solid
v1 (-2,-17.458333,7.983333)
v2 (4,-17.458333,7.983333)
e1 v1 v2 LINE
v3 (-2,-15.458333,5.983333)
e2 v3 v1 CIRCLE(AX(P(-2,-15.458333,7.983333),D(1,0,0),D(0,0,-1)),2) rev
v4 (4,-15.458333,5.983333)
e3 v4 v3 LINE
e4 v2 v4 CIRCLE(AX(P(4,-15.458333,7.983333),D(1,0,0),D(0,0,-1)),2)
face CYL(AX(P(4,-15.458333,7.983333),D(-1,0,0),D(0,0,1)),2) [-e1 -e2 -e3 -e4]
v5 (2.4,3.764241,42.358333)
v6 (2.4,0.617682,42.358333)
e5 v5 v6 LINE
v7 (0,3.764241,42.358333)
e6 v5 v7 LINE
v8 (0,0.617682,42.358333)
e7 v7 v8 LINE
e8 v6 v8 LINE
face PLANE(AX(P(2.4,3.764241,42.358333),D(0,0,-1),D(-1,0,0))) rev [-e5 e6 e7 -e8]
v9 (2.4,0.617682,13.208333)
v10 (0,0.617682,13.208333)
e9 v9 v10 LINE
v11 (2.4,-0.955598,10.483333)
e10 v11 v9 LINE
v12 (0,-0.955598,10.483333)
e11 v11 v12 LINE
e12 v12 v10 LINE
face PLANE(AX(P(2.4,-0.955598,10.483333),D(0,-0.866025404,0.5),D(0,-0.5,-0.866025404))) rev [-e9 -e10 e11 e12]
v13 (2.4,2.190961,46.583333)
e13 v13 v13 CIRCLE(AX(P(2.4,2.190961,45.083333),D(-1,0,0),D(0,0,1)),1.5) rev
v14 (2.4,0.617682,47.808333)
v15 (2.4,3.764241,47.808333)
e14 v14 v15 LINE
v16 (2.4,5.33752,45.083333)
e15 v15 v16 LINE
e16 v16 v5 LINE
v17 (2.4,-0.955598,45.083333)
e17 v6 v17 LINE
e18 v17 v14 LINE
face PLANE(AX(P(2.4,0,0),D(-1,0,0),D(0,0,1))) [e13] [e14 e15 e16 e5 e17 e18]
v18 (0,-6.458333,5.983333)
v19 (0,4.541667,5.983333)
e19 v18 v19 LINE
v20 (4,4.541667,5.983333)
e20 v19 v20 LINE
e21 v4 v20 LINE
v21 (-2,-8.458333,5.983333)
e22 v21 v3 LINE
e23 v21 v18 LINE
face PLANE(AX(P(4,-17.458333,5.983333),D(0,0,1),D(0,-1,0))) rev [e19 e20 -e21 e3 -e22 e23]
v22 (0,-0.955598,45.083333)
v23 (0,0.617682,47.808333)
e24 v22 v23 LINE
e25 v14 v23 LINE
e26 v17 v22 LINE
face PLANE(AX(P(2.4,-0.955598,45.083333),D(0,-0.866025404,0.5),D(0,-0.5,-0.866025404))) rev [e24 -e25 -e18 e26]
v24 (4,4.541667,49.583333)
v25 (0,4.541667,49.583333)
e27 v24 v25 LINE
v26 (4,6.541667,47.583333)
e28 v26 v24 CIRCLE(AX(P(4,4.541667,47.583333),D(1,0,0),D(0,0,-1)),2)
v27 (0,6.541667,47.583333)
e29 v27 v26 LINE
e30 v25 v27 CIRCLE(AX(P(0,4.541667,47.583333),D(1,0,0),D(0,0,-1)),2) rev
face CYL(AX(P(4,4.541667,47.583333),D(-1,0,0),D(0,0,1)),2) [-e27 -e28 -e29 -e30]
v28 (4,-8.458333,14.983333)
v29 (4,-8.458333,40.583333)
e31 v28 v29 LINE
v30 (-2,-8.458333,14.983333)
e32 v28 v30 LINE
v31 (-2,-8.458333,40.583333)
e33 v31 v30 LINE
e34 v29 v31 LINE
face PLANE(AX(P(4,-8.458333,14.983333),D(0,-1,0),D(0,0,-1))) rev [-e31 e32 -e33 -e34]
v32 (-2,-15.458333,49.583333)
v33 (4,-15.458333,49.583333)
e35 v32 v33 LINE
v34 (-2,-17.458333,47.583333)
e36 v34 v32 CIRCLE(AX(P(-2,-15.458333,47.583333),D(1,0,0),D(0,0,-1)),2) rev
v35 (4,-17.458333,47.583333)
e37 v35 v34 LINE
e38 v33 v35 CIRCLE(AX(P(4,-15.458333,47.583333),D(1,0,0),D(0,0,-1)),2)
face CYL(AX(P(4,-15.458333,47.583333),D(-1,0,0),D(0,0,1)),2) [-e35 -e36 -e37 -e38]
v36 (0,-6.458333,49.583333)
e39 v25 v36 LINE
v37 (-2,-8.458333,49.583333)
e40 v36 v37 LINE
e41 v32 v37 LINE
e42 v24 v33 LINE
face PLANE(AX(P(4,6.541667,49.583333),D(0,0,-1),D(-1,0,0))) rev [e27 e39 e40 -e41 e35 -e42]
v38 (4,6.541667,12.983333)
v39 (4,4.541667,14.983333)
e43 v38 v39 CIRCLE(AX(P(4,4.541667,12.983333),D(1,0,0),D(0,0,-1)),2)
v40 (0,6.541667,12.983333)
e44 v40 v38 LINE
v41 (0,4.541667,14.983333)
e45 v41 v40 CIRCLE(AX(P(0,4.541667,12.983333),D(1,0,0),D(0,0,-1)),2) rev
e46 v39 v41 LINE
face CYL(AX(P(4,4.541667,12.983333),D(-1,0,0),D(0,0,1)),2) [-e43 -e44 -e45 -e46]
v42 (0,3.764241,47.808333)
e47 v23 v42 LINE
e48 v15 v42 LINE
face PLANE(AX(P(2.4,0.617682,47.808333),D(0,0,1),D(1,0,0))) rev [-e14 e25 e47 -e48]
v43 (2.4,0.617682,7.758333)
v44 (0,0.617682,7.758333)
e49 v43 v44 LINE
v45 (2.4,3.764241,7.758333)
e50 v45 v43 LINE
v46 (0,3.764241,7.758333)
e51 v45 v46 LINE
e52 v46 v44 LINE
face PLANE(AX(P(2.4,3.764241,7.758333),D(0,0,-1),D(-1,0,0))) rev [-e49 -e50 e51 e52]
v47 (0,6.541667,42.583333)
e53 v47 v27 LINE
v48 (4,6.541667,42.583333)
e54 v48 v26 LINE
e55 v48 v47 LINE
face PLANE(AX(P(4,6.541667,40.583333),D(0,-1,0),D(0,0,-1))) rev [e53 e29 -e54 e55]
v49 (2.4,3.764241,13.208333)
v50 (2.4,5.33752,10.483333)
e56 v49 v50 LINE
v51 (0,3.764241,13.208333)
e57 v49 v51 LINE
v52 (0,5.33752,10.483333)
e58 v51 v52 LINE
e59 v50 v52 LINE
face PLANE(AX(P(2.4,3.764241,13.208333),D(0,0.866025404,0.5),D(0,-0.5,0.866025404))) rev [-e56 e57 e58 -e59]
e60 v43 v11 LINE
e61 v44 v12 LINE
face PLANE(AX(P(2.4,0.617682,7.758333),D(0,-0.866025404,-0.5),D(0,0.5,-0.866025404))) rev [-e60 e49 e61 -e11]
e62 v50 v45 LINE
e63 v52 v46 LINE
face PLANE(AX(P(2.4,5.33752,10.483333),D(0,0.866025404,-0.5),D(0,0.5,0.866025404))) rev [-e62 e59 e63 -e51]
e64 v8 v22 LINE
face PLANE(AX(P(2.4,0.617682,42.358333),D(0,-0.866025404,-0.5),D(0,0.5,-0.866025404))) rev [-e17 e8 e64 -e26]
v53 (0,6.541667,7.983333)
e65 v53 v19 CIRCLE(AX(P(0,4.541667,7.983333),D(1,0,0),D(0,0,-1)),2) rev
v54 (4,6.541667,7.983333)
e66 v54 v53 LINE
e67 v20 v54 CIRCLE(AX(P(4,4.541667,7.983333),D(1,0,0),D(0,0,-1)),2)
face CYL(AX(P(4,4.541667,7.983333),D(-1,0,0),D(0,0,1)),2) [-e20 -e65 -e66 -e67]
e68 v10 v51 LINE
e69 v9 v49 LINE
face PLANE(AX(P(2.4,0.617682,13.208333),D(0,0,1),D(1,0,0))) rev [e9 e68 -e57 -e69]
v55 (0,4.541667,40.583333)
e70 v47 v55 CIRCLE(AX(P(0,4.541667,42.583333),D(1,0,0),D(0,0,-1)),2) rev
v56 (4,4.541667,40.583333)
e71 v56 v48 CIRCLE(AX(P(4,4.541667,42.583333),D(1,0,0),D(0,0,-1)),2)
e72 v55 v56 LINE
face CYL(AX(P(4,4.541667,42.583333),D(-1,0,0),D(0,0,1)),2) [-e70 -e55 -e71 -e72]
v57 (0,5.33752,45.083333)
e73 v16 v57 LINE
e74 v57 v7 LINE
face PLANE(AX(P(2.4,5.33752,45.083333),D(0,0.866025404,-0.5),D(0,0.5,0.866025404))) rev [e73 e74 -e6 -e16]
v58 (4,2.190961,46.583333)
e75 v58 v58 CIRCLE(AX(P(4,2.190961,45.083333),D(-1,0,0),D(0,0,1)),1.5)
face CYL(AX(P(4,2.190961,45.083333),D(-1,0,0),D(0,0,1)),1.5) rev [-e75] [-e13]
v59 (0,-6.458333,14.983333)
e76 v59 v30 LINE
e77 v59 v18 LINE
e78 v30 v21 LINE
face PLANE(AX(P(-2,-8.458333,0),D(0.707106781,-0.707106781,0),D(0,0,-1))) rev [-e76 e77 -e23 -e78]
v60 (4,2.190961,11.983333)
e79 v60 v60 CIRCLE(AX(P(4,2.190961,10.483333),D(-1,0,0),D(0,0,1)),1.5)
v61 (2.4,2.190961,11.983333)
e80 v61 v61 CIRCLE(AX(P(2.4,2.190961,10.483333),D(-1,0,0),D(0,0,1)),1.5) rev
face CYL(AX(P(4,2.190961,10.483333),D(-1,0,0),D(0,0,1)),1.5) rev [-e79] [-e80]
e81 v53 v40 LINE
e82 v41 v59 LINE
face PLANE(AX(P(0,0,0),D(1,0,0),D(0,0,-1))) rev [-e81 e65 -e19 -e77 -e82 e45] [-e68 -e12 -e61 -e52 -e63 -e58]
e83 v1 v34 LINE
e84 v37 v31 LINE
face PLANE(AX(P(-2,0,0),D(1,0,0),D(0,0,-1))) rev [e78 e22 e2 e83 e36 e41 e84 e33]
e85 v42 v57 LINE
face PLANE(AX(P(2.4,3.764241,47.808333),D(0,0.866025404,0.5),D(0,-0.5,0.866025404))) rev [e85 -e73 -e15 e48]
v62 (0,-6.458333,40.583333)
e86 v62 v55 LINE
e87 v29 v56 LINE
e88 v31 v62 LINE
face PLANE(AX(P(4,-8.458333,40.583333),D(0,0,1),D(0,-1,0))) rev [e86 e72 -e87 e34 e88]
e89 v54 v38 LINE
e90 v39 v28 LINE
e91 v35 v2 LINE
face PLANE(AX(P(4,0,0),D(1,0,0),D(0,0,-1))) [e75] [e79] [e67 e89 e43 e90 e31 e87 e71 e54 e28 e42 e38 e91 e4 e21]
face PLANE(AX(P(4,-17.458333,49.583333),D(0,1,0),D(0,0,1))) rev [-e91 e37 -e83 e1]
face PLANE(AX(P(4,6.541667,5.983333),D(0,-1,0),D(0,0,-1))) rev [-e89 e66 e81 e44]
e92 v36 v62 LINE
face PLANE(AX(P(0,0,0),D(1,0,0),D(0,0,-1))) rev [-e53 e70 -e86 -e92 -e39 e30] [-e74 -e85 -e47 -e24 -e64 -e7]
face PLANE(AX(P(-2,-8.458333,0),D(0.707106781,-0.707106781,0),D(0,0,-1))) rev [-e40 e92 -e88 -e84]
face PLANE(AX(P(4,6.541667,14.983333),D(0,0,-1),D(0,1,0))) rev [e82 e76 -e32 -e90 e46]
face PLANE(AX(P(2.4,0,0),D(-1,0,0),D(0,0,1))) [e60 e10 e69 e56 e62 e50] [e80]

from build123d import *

# Parameters (mm, degrees)
EXTRUDE_1_DEPTH     = 4
SKETCH_2_R          = 1.5
CUT_EXTRUDE_1_DEPTH = 53.719070053
CUT_EXTRUDE_3_DEPTH = 2.4
EXTRUDE_2_DEPTH     = 2
FILLET_3_R          = 2
CHAMFER_1_SIZE      = 2


with BuildPart() as part:
    # Эскиз1 → Бобышка-Вытянуть1 (new body)
    with BuildSketch(Plane(origin=(0, 0, 0), x_dir=(0, 0, -1), z_dir=(1, 0, 0))):
        Polygon((-49.583333333, 6.541666667), (-49.583333333, -17.458333333), (-5.983333333, -17.458333333), (-5.983333333, 6.541666667), (-14.983333333, 6.541666667), (-14.983333333, -8.458333333), (-40.583333333, -8.458333333), (-40.583333333, 6.541666667), align=None)
    extrude(amount=EXTRUDE_1_DEPTH)

    # Эскиз2 → Вырез-Вытянуть1 (cut, through all)
    with BuildSketch(Plane.ZY):
        with Locations((10.483333333, 2.190961295)):
            Circle(SKETCH_2_R)
        with Locations((45.083333333, 2.190961295)):
            Circle(SKETCH_2_R)
    extrude(amount=-CUT_EXTRUDE_1_DEPTH, mode=Mode.SUBTRACT)

    # Эскиз4 → Вырез-Вытянуть3 (cut)
    with BuildSketch(Plane.ZY):
        Polygon((10.483333333, 5.337520262), (7.758333333, 3.764240779), (7.758333333, 0.617681812), (10.483333333, -0.955597672), (13.208333333, 0.617681812), (13.208333333, 3.764240779), align=None)
        Polygon((45.083333333, 5.337520262), (42.358333333, 3.764240779), (42.358333333, 0.617681812), (45.083333333, -0.955597672), (47.808333333, 0.617681812), (47.808333333, 3.764240779), align=None)
    extrude(amount=-CUT_EXTRUDE_3_DEPTH, mode=Mode.SUBTRACT)

    # Эскиз6 → Бобышка-Вытянуть2 (add)
    with BuildSketch(Plane.ZY):
        Polygon((5.983333333, -6.458333333), (14.983333333, -6.458333333), (14.983333333, -8.458333333), (40.583333333, -8.458333333), (40.583333333, -6.458333333), (49.583333333, -6.458333333), (49.583333333, -17.458333333), (5.983333333, -17.458333333), align=None)
    extrude(amount=EXTRUDE_2_DEPTH)

    # Скругление3
    fillet_3_edges = [part.edges().sort_by_distance(p)[0] for p in [
        (2, 6.541666667, 40.583333333),
        (2, 6.541666667, 14.983333333),
        (2, 6.541666667, 5.983333333),
        (1, -17.458333333, 5.983333333),
        (1, -17.458333333, 49.583333333),
        (2, 6.541666667, 49.583333333),
    ]]
    fillet(fillet_3_edges, radius=FILLET_3_R)

    # Фаска1
    chamfer_1_edges = [part.edges().sort_by_distance(p)[0] for p in [
        (-2, -6.458333333, 10.483333333),
        (-2, -6.458333333, 45.083333333),
    ]]
    chamfer(chamfer_1_edges, length=CHAMFER_1_SIZE - 0.0001)  # a hair under: the kernel refuses the full size


solid = part.part
